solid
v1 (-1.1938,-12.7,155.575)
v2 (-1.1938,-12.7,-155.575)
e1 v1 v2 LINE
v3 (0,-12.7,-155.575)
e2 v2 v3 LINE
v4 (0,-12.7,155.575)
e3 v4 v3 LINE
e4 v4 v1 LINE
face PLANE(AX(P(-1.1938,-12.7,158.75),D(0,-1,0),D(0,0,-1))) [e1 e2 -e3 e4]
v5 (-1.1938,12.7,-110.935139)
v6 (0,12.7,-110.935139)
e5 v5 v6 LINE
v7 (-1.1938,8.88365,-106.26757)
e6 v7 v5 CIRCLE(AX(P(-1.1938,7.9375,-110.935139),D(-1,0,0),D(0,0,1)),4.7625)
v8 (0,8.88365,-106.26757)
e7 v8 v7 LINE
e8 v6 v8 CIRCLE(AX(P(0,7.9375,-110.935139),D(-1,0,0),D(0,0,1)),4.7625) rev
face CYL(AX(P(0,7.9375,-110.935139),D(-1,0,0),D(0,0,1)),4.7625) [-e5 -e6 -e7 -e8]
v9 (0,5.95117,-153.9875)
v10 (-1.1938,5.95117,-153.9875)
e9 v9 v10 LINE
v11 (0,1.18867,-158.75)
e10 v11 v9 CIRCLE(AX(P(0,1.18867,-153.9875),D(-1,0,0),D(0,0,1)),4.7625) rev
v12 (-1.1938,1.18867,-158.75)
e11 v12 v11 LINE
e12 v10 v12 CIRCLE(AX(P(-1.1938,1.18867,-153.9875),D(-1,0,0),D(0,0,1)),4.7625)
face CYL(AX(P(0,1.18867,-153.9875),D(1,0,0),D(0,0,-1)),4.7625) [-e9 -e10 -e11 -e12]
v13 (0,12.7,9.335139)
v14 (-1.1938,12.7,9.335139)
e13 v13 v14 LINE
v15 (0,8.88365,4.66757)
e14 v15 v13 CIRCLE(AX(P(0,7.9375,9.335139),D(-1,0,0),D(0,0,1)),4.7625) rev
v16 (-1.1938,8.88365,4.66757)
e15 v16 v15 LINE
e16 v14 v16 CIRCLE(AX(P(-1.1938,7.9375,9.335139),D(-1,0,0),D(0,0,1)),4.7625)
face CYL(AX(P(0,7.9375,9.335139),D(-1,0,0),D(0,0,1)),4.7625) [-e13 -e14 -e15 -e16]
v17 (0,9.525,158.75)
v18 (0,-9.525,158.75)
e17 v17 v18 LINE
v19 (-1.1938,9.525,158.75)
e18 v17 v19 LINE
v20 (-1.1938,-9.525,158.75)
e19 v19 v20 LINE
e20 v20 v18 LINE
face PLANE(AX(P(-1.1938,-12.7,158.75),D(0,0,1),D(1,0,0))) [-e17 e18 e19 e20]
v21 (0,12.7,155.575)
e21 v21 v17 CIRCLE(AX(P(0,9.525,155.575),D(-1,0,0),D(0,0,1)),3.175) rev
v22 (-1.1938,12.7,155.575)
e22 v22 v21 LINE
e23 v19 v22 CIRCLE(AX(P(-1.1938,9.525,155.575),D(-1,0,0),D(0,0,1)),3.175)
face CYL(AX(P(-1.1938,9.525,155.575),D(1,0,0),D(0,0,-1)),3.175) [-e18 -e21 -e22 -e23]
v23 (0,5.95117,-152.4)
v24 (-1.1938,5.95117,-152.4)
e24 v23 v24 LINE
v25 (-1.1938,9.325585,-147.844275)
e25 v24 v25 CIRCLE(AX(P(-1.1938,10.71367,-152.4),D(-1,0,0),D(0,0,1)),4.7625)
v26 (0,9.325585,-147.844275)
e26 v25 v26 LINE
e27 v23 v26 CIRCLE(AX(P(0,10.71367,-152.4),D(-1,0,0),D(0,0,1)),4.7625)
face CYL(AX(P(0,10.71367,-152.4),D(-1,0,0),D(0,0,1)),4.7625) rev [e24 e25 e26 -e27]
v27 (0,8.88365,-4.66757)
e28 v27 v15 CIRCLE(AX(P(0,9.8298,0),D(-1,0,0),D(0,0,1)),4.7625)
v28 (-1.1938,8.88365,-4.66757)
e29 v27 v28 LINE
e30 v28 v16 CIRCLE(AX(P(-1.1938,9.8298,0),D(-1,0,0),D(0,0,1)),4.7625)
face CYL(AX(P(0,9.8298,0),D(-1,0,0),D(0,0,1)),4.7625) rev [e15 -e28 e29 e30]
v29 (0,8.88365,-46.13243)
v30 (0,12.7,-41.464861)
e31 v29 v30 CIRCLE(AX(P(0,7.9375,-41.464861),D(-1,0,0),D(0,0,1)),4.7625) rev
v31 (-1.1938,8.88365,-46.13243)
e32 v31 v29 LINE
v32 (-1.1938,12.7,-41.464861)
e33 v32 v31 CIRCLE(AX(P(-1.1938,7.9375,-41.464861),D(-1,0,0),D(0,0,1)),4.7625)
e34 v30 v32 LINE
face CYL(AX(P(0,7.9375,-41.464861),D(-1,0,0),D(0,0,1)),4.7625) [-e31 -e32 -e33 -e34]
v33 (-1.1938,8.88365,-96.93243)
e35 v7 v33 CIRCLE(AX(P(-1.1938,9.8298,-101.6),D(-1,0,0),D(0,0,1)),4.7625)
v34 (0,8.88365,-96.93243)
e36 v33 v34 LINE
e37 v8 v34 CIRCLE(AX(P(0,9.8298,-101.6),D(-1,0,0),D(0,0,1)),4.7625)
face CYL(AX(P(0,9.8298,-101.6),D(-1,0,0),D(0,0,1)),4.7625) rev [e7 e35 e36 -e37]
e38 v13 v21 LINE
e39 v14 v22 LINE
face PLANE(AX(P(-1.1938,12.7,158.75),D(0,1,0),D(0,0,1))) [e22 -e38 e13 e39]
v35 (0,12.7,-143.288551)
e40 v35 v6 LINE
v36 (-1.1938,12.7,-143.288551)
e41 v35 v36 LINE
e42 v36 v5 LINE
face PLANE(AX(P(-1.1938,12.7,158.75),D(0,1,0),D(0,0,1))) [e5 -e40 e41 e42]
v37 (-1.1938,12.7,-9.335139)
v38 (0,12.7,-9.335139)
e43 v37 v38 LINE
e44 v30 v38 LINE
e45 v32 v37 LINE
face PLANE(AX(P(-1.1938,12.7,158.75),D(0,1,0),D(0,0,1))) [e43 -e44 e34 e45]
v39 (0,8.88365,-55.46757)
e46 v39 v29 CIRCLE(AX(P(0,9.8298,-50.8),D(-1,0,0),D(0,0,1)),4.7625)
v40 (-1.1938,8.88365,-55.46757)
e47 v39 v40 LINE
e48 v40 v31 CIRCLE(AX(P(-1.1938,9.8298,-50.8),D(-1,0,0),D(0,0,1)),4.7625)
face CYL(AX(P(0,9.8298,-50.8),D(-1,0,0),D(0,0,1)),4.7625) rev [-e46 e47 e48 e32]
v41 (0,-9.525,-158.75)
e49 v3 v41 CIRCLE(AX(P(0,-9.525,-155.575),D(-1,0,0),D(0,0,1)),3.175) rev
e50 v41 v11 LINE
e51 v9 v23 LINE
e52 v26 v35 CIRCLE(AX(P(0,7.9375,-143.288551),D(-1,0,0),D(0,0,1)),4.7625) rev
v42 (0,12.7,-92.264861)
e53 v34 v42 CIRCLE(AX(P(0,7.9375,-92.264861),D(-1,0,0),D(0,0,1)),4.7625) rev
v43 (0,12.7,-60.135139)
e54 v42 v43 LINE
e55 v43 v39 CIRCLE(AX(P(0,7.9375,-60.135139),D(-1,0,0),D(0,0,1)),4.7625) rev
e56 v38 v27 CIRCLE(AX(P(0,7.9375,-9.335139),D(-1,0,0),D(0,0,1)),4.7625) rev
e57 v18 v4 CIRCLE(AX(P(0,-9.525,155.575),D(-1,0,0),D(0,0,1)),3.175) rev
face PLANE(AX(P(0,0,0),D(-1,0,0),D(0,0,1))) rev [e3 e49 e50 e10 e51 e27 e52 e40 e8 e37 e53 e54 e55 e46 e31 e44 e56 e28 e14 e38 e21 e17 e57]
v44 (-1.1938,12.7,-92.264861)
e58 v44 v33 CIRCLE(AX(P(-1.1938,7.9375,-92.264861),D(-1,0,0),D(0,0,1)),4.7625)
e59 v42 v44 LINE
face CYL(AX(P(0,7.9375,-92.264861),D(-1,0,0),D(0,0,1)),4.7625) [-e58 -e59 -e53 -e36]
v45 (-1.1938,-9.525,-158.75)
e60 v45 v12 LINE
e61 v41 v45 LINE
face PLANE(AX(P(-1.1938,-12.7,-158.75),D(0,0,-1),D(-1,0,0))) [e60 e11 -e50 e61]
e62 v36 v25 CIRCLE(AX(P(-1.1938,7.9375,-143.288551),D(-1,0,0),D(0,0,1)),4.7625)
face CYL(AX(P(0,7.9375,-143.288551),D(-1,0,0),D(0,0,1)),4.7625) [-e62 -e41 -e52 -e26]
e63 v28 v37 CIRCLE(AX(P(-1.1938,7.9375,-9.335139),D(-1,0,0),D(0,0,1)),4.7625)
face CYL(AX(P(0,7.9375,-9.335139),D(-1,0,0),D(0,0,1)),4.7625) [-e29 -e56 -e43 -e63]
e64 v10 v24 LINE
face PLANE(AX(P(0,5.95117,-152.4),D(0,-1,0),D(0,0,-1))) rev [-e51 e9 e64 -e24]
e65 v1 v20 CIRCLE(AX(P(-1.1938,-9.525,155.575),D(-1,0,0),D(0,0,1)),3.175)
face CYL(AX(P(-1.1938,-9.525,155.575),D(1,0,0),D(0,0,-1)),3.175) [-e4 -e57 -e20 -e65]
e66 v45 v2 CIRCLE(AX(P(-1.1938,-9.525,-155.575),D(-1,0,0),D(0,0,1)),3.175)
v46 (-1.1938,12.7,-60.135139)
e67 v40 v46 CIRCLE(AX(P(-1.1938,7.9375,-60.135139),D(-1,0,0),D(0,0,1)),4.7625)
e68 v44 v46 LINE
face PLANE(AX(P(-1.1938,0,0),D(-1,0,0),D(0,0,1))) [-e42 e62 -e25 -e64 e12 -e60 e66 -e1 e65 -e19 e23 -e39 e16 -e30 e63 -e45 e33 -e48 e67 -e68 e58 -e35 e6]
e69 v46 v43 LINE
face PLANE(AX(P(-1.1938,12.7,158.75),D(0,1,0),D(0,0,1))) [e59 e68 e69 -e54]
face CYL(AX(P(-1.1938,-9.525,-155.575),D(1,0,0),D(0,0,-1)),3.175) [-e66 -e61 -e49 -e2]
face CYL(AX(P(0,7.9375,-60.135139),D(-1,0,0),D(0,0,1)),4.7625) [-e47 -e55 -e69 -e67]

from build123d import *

# Parameters (mm, degrees)
SKETCH1_W              = 317.5
SKETCH1_H              = 25.4
BASE_FLANGE1_DEPTH     = 1.1938
FILLET1_R              = 3.175
CUT_EXTRUDE1_DEPTH     = 160.261664121
FILLET2_R              = 4.7625
LPATTERN2_COUNT        = 3
LPATTERN2_PITCH        = 50.8
FILLET2_OF_LPATTERN2_R = 4.7625
CUT_EXTRUDE2_DEPTH     = 160.261664229
FILLET3_R              = 4.7625


# Sheet-metal steps are written as plain solids
with BuildPart() as part:
    # Sketch1 → Base-Flange1 (new body)
    with BuildSketch(Plane(origin=(0, 0, 0), x_dir=(0, 0, -1), z_dir=(1, 0, 0))):
        Rectangle(SKETCH1_W, SKETCH1_H)
    extrude(amount=-BASE_FLANGE1_DEPTH)

    # Fillet1
    fillet1_edges = [part.edges().sort_by_distance(p)[0] for p in [
        (-0.5969, -12.7, -158.75),
        (-0.5969, -12.7, 158.75),
        (-0.5969, 12.7, 158.75),
        (-0.5969, 12.7, -158.75),
    ]]
    fillet(fillet1_edges, radius=FILLET1_R)

    # Sketch2 → Cut-Extrude1 (cut, through all)
    with BuildSketch(Plane.ZY.offset(1.1938)):
        with BuildLine():
            Line((-4.7625, 9.8298), (-4.7625, 12.7))
            Line((-4.7625, 12.7), (4.7625, 12.7))
            Line((4.7625, 12.7), (4.7625, 9.8298))
            ThreePointArc((4.7625, 9.8298), (0, 5.0673), (-4.7625, 9.8298))
        make_face()
    cut_extrude1 = extrude(amount=-CUT_EXTRUDE1_DEPTH, mode=Mode.SUBTRACT)

    # Fillet2
    fillet2_edges = [part.edges().sort_by_distance(p)[0] for p in [
        (-0.5969, 12.7, 4.7625),
        (-0.5969, 12.7, -4.7625),
    ]]
    fillet(fillet2_edges, radius=FILLET2_R)

    # LPattern2: Cut-Extrude1 ×3
    with Locations(*[(0, 0, -i * LPATTERN2_PITCH) for i in range(1, LPATTERN2_COUNT)]):
        add(cut_extrude1, mode=Mode.SUBTRACT)

    # Fillet2 of LPattern2
    fillet2_of_lpattern2_edges = [part.edges().sort_by_distance(p)[0] for p in [
        (-0.5969, 12.7, -46.0375),
        (-0.5969, 12.7, -55.5625),
        (-0.5969, 12.7, -96.8375),
        (-0.5969, 12.7, -106.3625),
    ]]
    fillet(fillet2_of_lpattern2_edges, radius=FILLET2_OF_LPATTERN2_R)

    # Sketch3 → Cut-Extrude2 (cut, through all)
    with BuildSketch(Plane.ZY.offset(1.1938)):
        with BuildLine():
            Line((-152.4, 5.951169638), (-158.75, 5.951169638))
            Line((-158.75, 5.951169638), (-158.75, 9.525))
            ThreePointArc((-158.75, 9.525), (-157.82006403, 11.77006403), (-155.575, 12.7))
            Line((-155.575, 12.7), (-147.6375, 12.7))
            Line((-147.6375, 12.7), (-147.6375, 10.713669638))
            ThreePointArc((-147.6375, 10.713669638), (-149.032403955, 7.346073593), (-152.4, 5.951169638))
        make_face()
    extrude(amount=-CUT_EXTRUDE2_DEPTH, mode=Mode.SUBTRACT)

    # Fillet3
    fillet3_edges = [part.edges().sort_by_distance(p)[0] for p in [
        (-0.5969, 5.951169638, -158.75),
        (-0.5969, 12.7, -147.6375),
    ]]
    fillet(fillet3_edges, radius=FILLET3_R)


solid = part.part
